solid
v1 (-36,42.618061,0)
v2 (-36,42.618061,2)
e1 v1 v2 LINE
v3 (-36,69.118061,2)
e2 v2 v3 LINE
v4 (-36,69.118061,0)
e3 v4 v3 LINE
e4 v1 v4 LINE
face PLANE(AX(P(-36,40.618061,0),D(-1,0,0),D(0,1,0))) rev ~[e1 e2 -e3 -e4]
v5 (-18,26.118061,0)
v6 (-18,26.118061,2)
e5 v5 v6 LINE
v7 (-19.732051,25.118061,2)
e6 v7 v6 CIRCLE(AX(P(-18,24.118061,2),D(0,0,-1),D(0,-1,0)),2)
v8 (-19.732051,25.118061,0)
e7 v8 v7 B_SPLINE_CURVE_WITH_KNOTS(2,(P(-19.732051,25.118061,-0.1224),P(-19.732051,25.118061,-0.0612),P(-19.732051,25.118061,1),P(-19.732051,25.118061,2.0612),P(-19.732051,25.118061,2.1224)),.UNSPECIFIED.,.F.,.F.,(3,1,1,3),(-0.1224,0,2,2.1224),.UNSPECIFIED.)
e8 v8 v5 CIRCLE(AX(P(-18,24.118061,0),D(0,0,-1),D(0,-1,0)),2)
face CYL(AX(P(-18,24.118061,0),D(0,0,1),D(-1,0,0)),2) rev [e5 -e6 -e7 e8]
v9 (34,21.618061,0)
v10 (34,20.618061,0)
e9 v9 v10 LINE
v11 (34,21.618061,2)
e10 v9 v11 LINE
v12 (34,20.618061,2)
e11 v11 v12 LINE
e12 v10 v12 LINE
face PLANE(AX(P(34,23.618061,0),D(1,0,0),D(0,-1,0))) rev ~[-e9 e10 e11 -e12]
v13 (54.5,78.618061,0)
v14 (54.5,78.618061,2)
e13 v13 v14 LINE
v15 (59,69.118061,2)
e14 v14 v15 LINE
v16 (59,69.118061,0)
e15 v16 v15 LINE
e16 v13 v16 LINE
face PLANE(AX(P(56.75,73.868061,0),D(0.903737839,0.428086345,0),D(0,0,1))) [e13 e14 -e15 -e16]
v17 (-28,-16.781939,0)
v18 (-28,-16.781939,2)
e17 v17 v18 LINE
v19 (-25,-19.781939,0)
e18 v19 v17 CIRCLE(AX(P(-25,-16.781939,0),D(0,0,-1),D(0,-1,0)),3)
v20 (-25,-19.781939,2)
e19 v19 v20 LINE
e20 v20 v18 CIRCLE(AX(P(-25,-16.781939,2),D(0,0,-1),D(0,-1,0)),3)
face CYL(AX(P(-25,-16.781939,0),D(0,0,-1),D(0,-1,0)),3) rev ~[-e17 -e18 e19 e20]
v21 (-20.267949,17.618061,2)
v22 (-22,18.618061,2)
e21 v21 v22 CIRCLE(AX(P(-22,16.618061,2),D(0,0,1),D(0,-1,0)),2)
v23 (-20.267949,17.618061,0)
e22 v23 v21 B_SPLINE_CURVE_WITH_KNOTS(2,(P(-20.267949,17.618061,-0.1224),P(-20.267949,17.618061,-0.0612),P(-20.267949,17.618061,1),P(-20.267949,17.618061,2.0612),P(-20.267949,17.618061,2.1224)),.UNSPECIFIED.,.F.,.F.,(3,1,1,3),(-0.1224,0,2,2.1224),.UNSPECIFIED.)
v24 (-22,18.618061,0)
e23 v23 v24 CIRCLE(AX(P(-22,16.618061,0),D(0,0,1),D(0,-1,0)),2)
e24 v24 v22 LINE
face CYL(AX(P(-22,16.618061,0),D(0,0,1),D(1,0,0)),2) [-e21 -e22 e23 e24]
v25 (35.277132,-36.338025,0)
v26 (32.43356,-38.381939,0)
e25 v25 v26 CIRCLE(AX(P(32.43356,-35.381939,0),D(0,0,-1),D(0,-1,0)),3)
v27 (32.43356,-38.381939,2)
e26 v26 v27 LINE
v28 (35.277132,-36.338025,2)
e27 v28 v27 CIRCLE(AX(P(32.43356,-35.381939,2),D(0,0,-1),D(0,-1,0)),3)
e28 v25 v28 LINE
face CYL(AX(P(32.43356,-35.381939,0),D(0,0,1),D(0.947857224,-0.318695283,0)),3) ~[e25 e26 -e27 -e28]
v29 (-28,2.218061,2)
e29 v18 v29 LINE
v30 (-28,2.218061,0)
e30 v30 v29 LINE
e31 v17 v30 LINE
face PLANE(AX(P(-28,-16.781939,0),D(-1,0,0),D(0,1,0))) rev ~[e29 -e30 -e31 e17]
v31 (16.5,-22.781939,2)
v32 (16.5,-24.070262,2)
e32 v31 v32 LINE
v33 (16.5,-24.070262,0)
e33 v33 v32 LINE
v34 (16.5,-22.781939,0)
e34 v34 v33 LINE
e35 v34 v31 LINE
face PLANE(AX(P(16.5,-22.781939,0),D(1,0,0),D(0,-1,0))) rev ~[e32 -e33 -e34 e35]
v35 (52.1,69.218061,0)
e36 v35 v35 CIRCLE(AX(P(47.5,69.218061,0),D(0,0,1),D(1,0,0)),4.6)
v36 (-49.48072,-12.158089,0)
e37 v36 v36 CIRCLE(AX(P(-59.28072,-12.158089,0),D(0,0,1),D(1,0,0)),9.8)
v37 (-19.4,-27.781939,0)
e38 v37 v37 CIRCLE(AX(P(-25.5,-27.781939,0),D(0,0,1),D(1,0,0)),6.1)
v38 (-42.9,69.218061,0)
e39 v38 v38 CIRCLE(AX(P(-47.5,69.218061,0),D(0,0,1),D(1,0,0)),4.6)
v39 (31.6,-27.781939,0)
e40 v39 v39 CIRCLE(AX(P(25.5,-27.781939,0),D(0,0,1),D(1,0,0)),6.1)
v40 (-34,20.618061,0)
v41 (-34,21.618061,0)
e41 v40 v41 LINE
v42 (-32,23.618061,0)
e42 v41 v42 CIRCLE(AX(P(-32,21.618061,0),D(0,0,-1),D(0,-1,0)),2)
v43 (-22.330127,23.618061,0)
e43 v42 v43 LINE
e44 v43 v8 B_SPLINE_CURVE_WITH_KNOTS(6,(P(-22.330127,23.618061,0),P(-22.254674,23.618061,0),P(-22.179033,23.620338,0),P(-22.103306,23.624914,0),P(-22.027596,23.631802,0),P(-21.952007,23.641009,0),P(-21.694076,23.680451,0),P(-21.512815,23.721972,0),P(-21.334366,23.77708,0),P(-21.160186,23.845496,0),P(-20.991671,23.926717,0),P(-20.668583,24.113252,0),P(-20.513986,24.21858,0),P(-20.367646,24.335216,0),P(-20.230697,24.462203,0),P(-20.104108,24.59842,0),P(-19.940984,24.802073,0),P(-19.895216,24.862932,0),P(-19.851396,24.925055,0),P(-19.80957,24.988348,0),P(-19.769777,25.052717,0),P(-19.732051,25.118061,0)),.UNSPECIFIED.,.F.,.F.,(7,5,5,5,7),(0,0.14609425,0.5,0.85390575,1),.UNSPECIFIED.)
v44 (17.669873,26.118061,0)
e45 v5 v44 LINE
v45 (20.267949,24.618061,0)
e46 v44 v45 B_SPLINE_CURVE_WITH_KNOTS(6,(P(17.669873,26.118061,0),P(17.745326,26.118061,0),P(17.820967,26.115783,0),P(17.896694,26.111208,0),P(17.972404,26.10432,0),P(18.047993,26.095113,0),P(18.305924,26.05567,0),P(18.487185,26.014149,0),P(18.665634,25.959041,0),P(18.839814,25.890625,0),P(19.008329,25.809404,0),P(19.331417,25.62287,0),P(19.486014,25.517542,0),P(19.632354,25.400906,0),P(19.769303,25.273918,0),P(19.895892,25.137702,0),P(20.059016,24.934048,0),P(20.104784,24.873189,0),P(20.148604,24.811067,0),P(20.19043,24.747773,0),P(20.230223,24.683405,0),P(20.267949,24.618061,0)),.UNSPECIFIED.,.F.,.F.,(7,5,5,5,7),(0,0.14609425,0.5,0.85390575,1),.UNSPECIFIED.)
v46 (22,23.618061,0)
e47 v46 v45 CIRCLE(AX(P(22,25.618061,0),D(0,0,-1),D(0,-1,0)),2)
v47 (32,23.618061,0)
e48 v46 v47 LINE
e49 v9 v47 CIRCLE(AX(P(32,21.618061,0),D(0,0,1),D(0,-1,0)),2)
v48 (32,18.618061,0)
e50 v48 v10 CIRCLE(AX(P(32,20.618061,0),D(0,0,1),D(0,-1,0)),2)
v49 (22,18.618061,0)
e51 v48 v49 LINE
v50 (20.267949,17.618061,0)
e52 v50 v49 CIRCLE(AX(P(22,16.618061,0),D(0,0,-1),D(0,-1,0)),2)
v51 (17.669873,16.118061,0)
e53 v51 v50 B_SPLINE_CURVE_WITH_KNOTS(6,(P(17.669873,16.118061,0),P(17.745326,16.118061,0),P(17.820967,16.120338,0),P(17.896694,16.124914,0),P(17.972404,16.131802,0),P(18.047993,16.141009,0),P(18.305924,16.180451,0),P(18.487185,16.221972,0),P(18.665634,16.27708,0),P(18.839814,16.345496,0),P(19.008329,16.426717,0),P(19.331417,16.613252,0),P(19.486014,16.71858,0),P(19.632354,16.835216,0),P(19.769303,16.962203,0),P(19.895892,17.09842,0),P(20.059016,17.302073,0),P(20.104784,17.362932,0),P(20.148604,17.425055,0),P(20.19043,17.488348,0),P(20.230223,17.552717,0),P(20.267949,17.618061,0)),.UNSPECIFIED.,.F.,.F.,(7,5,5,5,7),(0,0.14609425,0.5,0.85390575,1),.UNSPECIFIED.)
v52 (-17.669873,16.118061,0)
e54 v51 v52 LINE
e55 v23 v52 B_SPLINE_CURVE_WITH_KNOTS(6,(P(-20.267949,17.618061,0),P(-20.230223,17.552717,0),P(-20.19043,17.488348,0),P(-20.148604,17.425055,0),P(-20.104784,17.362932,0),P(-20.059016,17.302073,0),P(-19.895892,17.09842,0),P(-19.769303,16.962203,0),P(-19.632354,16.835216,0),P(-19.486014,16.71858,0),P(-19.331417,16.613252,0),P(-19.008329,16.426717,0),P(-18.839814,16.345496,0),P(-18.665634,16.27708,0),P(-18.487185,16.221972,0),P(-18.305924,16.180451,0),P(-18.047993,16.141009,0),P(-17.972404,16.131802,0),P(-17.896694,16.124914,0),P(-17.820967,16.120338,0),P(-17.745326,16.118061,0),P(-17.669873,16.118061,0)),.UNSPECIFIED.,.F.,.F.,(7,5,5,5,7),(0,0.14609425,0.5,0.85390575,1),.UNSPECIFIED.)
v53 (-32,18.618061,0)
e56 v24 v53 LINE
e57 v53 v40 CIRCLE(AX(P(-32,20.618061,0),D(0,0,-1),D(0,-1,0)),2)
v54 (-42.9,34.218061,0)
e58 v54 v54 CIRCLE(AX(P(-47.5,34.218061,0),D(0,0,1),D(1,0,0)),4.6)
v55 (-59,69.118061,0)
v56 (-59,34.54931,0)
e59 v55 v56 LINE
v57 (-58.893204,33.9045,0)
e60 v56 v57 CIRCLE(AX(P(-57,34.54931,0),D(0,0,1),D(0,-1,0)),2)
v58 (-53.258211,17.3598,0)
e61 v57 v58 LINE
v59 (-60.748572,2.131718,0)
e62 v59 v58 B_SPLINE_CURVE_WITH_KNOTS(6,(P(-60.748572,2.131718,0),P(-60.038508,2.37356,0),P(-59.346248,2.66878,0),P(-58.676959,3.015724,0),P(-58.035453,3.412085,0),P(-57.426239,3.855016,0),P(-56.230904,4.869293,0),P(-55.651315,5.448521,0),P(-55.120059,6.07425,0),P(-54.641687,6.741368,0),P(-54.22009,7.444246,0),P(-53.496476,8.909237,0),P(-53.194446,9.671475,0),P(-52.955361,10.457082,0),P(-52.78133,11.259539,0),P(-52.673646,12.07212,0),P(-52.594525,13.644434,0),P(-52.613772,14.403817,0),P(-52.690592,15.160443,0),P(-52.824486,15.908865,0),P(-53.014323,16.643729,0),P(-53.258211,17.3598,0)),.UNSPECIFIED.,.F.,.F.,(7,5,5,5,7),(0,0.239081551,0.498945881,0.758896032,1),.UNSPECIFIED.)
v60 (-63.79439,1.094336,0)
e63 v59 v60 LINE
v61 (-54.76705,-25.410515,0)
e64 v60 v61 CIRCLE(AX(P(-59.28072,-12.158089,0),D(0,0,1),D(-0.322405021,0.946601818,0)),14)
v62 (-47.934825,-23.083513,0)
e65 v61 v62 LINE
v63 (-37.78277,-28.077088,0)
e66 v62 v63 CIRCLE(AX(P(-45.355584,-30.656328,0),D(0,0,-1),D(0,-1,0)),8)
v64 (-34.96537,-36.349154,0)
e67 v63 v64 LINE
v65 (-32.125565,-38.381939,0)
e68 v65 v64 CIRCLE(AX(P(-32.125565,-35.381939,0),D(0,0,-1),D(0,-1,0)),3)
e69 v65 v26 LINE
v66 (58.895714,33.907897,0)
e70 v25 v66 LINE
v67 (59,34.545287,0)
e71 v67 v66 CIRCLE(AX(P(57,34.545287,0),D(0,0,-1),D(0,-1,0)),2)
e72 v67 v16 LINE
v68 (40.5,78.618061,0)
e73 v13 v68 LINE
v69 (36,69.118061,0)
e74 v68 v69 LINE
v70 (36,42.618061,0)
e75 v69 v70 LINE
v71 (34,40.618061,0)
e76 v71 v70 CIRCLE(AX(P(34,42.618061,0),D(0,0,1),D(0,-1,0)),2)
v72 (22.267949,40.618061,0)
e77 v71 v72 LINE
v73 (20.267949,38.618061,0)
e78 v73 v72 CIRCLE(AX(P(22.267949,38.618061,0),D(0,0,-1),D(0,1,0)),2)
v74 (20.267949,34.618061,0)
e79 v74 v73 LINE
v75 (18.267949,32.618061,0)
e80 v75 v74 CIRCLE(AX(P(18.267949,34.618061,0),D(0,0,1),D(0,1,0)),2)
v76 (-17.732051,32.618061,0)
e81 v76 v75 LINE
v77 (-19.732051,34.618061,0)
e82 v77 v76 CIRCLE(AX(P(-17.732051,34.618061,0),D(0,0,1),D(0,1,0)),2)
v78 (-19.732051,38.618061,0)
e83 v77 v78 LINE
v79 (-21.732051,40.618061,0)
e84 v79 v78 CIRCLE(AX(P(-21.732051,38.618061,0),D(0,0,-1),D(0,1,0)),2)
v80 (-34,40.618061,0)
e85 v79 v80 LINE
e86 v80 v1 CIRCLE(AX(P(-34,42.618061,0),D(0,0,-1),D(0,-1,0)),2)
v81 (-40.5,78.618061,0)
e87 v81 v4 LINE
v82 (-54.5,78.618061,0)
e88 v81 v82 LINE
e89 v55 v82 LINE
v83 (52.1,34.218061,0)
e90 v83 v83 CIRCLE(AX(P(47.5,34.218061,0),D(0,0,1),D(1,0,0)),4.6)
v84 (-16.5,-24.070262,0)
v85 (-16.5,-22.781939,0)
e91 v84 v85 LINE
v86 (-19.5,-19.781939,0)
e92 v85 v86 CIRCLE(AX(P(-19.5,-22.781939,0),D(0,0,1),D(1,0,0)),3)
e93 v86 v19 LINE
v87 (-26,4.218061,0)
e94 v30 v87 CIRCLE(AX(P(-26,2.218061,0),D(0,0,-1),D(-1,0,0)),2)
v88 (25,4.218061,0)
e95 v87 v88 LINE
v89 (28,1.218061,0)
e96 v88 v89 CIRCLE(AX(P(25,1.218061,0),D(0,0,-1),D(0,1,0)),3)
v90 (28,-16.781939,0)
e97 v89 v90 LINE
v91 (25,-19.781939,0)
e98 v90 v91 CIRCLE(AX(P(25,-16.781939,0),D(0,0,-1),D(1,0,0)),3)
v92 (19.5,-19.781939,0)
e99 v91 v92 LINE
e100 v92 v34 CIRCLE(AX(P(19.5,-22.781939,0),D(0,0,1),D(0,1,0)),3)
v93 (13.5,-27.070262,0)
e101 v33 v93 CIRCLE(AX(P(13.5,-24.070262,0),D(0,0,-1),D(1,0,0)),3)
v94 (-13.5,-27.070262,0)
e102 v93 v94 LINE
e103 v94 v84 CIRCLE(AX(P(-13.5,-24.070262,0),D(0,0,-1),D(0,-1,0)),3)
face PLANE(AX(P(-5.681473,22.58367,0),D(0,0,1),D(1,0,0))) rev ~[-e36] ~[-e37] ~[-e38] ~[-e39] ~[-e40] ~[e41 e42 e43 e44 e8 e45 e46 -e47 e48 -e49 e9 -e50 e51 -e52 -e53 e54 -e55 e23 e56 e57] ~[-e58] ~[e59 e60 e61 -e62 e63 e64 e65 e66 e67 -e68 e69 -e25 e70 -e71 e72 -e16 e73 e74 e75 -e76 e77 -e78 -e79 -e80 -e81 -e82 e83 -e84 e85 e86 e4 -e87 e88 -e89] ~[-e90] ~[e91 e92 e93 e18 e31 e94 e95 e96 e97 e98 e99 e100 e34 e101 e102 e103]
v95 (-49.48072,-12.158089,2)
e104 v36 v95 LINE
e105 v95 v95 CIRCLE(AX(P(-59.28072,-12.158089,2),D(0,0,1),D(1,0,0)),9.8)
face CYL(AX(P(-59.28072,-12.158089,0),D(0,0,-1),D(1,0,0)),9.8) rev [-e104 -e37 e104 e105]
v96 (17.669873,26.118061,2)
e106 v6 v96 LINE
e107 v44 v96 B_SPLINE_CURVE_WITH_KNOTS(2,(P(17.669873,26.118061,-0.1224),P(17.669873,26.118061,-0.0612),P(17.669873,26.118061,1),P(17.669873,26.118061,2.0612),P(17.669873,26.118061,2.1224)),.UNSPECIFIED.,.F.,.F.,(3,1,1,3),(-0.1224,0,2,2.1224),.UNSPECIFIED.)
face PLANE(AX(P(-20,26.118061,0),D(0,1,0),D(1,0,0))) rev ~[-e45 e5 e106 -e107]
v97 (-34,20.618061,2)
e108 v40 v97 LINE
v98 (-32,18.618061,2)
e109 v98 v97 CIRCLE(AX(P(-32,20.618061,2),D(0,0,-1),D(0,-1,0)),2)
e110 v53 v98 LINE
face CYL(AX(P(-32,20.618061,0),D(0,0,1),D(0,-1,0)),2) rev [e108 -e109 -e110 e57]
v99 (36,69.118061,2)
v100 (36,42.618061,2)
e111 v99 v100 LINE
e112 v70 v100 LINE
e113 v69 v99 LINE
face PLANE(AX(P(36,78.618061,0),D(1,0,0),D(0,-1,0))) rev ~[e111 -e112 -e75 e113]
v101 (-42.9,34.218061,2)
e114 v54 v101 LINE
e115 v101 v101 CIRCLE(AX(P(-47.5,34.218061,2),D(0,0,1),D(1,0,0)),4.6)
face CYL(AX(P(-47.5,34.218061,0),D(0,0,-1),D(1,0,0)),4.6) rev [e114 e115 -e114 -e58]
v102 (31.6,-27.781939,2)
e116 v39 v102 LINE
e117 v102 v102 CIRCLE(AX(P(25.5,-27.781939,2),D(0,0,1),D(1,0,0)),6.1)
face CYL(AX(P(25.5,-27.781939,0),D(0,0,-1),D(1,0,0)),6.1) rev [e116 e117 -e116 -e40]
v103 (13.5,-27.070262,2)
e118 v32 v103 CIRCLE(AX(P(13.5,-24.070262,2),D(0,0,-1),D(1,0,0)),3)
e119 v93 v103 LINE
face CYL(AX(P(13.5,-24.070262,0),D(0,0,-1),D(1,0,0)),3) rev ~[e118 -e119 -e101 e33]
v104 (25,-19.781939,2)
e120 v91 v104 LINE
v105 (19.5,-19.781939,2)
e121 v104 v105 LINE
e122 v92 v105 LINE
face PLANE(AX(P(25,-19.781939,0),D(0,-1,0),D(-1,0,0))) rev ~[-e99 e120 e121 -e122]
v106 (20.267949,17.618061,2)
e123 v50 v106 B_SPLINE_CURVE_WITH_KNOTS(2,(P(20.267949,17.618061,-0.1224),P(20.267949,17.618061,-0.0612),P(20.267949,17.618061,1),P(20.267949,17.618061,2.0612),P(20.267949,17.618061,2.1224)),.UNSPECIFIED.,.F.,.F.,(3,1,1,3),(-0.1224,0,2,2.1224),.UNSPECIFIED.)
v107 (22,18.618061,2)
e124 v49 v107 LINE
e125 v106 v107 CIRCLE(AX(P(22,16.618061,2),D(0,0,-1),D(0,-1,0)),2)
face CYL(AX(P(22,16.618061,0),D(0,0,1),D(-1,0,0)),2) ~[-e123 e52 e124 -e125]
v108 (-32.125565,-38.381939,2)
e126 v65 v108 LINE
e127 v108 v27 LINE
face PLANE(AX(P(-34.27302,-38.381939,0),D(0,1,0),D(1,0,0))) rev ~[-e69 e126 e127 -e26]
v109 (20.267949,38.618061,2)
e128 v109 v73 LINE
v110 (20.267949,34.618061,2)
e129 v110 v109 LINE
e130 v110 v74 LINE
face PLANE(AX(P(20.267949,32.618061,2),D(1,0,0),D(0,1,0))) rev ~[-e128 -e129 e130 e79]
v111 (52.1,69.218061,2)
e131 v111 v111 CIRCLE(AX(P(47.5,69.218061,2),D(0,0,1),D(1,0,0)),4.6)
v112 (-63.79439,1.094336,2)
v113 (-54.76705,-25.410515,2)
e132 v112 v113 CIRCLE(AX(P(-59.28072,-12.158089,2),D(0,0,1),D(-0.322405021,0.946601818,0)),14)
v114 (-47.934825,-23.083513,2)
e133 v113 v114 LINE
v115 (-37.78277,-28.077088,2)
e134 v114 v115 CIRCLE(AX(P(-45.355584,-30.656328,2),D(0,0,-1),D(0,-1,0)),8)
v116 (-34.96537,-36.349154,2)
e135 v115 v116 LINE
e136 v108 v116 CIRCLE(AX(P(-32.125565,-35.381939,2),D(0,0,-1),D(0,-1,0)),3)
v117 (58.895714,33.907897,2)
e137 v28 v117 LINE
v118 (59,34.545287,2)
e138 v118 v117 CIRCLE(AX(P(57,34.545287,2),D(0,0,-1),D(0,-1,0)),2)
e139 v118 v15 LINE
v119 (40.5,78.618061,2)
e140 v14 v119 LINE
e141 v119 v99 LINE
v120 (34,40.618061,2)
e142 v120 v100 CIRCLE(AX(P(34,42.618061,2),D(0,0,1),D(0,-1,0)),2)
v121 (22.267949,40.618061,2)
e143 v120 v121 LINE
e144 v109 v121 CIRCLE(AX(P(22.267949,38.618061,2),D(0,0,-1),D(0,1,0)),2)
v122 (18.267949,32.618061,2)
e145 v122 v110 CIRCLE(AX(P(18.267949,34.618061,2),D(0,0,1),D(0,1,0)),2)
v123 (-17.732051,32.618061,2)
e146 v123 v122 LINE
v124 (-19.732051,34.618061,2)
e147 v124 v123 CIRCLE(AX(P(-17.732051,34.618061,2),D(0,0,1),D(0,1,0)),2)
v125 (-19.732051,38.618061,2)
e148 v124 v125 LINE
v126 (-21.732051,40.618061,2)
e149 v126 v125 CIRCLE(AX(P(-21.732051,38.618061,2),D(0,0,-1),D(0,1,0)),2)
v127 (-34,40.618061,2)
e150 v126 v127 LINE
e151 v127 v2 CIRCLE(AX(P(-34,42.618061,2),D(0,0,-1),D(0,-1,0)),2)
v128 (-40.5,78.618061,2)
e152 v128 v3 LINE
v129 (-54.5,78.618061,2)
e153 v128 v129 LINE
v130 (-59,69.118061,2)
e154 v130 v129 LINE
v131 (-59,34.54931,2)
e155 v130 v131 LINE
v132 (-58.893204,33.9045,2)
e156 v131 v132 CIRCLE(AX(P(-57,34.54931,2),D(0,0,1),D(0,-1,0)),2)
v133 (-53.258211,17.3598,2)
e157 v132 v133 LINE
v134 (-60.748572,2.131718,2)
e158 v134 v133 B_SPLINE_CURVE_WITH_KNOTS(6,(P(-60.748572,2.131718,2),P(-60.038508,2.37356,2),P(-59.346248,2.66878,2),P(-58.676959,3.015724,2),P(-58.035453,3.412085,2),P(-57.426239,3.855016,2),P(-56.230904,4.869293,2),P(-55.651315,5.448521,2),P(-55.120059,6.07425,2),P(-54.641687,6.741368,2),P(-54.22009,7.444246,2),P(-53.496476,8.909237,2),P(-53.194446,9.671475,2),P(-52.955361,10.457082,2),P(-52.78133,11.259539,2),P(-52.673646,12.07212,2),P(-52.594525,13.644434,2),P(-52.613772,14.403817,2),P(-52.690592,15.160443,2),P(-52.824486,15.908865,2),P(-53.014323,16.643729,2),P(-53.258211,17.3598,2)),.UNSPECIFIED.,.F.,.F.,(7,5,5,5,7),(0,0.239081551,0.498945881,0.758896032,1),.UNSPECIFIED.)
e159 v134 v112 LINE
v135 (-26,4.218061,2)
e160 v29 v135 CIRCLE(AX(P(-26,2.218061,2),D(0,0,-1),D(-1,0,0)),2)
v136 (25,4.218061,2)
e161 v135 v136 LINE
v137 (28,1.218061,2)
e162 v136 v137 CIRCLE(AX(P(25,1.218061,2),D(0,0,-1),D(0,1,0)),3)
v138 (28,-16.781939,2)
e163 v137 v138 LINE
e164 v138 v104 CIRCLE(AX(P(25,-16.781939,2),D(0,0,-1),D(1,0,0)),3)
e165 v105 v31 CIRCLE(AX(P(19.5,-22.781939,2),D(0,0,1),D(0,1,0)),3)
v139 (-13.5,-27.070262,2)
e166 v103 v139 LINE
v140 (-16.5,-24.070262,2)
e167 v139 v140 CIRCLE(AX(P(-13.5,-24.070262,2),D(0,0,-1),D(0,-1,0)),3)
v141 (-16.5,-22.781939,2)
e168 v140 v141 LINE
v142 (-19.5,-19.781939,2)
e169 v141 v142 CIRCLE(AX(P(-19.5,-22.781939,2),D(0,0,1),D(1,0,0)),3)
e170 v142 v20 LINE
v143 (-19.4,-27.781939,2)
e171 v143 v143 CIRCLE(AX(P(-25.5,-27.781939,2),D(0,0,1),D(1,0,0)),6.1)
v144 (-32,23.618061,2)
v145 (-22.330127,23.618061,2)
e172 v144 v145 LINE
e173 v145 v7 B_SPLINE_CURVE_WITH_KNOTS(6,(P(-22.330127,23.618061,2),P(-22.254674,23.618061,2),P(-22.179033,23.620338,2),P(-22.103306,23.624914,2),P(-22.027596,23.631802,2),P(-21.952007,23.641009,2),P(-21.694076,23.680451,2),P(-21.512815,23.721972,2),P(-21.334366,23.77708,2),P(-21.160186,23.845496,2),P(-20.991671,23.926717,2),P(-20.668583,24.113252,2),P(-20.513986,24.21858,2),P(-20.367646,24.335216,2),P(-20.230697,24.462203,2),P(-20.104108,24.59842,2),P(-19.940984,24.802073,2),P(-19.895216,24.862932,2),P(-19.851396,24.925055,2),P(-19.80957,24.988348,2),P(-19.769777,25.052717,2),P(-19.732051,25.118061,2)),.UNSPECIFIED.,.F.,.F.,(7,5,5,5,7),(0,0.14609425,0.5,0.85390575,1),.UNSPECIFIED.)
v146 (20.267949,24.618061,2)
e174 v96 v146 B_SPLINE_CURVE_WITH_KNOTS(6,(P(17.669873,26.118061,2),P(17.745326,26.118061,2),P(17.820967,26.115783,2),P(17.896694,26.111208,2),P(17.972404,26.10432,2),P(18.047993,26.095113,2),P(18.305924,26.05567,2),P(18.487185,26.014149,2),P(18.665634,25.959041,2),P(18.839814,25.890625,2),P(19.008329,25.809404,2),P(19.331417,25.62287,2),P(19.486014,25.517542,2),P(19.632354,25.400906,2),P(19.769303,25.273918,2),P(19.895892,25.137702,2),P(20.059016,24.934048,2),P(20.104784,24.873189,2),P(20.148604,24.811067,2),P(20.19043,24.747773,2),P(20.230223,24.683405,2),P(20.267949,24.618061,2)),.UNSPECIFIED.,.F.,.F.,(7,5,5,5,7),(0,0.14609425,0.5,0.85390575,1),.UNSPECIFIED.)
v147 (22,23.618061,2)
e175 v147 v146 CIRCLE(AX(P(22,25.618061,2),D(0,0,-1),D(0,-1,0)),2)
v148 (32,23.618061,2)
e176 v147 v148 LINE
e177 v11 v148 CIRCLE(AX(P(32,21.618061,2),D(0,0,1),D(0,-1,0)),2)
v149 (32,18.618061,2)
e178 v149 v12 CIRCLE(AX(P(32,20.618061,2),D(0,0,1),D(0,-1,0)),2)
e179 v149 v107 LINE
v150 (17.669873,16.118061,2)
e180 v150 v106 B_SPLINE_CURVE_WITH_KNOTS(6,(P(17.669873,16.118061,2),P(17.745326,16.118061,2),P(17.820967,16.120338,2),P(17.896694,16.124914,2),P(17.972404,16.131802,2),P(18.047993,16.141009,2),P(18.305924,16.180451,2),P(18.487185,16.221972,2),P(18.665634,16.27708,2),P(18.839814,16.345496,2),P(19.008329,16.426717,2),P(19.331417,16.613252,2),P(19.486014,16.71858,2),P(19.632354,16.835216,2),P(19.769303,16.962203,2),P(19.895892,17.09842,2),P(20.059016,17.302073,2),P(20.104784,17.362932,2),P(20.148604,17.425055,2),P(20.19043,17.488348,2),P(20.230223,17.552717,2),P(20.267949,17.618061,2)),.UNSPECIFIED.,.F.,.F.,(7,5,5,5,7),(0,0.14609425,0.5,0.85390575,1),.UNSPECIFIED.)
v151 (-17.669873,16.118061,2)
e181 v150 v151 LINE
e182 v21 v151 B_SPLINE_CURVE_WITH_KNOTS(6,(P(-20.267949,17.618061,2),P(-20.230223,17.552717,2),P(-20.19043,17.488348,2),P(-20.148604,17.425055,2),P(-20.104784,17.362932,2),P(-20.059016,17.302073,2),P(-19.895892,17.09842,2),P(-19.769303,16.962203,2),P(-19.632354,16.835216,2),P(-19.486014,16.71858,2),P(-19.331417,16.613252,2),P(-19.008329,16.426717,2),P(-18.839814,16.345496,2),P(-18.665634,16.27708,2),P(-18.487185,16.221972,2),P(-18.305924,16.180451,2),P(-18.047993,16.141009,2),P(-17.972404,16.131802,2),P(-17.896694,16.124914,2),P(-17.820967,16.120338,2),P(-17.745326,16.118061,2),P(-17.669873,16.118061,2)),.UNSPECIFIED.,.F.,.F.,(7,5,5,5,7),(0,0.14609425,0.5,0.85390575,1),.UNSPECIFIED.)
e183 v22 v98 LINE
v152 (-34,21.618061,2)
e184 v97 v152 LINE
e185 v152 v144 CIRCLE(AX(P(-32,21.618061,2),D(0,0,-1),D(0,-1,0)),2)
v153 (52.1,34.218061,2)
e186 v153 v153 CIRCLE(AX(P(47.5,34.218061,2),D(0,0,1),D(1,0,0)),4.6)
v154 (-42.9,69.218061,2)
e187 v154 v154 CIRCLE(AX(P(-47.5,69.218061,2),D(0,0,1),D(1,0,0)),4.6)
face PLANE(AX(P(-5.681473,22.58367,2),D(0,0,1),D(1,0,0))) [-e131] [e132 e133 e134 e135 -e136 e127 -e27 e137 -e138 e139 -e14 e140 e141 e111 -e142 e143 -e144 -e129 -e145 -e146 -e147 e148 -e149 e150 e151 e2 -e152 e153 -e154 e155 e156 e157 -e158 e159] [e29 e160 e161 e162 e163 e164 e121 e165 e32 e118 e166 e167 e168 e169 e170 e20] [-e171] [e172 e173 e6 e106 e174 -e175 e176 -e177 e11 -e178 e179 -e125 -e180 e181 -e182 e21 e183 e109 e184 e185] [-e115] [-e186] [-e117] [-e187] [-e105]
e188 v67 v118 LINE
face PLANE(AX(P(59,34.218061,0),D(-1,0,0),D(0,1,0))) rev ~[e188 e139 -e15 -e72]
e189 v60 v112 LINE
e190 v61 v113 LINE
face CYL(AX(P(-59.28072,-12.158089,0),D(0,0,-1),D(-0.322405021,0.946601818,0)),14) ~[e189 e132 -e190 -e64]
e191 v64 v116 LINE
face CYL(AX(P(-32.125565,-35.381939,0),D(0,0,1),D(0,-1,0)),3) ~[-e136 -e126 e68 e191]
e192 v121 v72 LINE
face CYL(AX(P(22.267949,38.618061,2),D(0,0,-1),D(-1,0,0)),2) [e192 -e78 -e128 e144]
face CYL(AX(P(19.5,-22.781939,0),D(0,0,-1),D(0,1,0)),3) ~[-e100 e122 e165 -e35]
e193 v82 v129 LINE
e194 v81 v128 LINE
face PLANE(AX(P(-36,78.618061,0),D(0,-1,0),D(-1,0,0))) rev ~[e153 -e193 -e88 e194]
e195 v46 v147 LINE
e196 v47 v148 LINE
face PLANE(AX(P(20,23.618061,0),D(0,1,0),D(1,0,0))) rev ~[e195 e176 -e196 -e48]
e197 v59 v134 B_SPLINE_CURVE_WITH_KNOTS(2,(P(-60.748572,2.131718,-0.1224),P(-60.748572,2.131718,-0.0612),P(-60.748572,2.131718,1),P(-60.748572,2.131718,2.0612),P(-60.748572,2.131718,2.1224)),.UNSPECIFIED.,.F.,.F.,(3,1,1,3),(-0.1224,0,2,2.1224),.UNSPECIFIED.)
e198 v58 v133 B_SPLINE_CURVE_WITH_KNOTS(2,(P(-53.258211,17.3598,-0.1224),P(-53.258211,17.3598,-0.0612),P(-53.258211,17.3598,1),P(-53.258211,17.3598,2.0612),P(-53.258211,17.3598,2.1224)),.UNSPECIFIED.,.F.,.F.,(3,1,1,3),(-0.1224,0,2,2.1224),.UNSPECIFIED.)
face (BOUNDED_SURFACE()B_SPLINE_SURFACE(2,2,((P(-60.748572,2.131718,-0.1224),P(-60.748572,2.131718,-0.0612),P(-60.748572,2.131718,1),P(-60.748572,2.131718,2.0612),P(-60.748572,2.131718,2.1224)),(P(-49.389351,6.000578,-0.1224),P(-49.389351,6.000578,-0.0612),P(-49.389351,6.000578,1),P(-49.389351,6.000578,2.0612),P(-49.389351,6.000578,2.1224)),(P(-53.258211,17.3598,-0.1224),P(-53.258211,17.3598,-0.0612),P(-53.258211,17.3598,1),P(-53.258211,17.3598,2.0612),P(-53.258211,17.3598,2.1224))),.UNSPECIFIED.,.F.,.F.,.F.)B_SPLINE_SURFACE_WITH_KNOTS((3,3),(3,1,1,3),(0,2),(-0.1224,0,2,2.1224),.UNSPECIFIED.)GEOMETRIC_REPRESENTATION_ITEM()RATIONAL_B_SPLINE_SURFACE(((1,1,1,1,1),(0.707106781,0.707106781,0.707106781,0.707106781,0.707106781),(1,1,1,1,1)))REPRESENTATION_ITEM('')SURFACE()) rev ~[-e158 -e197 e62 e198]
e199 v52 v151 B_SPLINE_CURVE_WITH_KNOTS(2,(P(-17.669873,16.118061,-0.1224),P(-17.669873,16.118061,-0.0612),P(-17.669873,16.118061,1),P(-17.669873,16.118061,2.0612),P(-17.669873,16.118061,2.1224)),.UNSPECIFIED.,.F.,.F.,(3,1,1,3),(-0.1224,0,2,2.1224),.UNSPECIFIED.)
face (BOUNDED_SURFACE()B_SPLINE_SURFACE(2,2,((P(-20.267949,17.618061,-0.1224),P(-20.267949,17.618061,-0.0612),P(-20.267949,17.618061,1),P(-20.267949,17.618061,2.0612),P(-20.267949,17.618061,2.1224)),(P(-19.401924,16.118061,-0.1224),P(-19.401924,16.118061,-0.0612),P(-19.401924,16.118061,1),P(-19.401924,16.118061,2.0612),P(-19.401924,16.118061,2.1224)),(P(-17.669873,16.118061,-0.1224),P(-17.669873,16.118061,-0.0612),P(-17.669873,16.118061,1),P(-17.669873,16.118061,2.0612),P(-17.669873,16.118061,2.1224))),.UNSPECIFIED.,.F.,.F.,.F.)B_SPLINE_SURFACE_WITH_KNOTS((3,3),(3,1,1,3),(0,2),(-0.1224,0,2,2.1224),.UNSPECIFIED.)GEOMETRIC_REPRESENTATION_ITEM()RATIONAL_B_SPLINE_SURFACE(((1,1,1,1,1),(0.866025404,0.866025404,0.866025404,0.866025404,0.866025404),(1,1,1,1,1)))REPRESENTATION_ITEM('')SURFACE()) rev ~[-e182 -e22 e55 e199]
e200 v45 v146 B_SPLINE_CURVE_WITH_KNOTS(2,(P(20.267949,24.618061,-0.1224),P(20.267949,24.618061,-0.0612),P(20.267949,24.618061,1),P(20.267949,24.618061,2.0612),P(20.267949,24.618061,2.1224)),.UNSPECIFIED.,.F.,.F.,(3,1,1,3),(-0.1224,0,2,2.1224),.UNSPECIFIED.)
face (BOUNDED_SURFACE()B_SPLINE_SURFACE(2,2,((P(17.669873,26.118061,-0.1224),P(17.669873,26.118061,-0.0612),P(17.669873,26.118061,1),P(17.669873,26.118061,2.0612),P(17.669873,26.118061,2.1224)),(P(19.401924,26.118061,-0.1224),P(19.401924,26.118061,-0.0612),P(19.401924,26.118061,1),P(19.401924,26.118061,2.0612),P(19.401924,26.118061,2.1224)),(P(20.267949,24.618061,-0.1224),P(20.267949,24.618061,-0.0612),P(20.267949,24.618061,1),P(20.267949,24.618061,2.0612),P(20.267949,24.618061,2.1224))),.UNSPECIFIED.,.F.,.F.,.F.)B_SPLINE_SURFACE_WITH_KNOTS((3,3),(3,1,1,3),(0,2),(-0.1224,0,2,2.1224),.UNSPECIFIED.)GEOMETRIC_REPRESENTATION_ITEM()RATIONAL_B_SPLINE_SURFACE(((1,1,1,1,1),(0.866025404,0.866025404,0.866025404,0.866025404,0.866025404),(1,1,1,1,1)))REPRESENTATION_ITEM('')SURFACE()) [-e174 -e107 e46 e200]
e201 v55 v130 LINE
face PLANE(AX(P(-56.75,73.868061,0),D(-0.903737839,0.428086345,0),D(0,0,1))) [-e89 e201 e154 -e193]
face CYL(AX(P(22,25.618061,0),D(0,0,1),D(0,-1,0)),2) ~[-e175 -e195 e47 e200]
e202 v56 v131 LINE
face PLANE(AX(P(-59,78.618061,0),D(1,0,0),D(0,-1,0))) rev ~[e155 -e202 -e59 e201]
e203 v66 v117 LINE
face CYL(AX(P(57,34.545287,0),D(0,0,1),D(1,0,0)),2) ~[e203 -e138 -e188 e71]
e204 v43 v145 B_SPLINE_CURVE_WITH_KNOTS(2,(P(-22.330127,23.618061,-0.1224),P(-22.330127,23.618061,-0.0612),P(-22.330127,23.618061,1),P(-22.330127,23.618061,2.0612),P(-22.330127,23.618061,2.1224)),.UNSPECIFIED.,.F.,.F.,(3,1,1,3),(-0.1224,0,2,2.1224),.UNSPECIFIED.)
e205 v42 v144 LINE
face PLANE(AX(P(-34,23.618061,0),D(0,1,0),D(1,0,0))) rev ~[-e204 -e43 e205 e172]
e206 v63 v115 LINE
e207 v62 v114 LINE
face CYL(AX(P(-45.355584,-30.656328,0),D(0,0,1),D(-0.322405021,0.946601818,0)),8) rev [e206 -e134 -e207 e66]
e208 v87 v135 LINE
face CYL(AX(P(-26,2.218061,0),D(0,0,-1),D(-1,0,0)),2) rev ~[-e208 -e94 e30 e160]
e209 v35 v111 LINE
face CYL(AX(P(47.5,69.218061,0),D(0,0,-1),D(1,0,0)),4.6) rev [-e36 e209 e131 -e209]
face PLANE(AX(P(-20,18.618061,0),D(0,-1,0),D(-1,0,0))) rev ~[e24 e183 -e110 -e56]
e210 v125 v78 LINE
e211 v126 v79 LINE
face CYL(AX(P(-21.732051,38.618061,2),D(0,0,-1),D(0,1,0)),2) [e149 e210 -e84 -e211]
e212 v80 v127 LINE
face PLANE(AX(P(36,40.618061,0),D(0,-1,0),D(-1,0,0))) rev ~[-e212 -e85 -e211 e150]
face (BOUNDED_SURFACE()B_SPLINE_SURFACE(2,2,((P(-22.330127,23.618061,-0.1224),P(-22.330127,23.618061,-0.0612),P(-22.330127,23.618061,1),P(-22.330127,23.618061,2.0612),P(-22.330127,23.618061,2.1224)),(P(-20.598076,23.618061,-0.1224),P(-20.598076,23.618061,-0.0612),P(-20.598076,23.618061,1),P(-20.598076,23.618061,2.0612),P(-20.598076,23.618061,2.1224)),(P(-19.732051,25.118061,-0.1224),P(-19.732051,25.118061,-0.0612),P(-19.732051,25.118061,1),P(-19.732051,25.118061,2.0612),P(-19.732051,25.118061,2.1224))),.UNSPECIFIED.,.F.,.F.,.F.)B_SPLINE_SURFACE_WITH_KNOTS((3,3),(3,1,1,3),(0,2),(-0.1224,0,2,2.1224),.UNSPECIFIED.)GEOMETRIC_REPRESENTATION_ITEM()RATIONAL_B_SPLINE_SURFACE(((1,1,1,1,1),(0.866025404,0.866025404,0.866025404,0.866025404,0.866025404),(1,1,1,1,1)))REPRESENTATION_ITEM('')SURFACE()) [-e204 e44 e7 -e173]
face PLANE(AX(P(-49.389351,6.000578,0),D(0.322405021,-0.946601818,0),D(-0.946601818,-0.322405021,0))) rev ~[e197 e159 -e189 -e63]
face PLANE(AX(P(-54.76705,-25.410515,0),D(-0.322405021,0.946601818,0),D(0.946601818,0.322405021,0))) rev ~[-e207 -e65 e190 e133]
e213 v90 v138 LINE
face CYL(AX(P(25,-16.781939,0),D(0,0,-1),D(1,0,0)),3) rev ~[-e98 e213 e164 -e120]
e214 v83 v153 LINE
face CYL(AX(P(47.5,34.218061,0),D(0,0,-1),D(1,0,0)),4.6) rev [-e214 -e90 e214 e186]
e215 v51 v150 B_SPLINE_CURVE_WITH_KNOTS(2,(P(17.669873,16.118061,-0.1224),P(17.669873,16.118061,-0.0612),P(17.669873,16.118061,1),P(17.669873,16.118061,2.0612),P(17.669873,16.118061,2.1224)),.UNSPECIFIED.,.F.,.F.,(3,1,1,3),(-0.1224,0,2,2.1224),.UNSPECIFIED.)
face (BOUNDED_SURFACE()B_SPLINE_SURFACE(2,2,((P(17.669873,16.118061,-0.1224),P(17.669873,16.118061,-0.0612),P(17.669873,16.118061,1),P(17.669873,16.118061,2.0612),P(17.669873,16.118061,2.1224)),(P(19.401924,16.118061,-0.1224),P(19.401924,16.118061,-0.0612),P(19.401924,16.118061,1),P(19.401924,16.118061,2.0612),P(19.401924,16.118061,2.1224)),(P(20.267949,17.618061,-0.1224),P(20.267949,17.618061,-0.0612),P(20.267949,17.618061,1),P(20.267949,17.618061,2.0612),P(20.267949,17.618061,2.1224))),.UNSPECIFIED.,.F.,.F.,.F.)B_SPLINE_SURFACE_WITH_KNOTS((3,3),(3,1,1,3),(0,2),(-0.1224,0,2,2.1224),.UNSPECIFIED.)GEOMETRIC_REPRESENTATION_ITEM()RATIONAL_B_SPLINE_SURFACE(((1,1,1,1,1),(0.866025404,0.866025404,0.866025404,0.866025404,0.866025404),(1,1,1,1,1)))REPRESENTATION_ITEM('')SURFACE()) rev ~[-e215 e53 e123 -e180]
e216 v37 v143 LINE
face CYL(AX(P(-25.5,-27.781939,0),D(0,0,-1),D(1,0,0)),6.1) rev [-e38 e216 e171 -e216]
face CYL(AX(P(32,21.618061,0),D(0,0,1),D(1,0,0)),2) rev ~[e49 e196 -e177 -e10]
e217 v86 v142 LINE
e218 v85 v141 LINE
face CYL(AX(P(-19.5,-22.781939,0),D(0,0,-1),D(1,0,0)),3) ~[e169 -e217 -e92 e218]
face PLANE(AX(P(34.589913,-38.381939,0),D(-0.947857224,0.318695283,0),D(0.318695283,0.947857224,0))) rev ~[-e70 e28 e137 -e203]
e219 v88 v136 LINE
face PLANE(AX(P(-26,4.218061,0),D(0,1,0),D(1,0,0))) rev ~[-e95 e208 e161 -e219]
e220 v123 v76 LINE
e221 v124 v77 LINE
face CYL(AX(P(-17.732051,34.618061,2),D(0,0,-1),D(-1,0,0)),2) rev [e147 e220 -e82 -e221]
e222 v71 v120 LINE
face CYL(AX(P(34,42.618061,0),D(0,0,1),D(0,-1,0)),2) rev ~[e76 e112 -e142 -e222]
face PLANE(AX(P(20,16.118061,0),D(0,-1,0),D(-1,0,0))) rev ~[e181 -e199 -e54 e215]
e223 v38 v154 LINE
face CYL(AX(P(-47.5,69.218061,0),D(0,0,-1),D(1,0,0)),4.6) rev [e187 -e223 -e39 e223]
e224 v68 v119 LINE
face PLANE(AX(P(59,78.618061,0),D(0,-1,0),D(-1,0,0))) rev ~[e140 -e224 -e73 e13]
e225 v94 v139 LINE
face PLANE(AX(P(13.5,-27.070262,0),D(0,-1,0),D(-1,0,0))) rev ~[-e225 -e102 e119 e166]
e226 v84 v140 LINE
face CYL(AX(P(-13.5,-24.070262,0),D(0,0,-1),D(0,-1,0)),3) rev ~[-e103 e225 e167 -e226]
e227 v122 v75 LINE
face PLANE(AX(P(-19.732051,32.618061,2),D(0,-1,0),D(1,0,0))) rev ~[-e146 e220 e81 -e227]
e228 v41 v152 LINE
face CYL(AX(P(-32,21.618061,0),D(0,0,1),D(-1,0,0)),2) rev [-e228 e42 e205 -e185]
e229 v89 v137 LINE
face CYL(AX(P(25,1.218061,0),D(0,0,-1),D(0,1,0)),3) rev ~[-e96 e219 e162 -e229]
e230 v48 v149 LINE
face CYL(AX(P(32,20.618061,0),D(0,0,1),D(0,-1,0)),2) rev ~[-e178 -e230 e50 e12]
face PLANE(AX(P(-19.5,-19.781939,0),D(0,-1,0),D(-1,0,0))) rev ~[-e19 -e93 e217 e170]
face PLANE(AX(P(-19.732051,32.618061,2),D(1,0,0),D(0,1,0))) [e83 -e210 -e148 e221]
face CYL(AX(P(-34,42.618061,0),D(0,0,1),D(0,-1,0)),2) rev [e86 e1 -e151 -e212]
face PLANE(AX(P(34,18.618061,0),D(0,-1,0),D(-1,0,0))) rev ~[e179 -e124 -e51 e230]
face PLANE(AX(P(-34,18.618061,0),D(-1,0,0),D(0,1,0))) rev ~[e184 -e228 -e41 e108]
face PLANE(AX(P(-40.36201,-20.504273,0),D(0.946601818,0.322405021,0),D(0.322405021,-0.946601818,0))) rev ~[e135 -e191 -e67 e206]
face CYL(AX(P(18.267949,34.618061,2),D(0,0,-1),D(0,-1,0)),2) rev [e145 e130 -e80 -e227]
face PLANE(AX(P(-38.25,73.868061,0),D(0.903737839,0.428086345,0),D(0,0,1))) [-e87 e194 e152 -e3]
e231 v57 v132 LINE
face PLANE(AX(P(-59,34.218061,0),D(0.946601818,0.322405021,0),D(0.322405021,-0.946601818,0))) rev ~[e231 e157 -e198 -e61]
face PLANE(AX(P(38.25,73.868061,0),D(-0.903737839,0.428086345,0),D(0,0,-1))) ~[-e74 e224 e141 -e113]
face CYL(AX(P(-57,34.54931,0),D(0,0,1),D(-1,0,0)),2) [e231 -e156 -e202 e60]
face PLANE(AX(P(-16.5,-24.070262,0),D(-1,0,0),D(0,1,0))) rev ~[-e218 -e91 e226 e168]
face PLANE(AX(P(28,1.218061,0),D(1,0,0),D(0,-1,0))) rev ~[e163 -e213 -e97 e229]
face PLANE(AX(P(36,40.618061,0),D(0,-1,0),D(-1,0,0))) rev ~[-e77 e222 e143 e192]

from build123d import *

# Parameters (mm, degrees)
F0_R        = 9.8
F0_R_2      = 6.1
F0_R_3      = 4.6
F1_DEPTH    = 2
F2_R        = 2
F3_R        = 3
F4_W        = 40
F4_H        = 8
F5_DEPTH    = 25
F6_R        = 2
F7_R        = 8
F8_R        = 12
F9_C1_SIZE2 = 4.5
F9_C1_SIZE  = 9.5
F9_C2_SIZE2 = 9.5
F9_C2_SIZE  = 4.5
F9_C3_SIZE2 = 9.5
F9_C3_SIZE  = 4.5
F9_C4_SIZE2 = 9.5
F9_C4_SIZE  = 4.5


# Not quite as in the source:
# - two fillets or chamfers of one size are made in one step


with BuildPart() as f1:
    # F0 (on Top) → F1 (new body)
    with BuildSketch(Plane.XY):
        with BuildLine():
            Line((36, 40.6180607378), (-36, 40.6180607378))
            Line((-36, 40.6180607378), (-36, 78.6180607378))
            Line((-36, 78.6180607378), (-59, 78.6180607378))
            Line((-59, 78.6180607378), (-59, 40.6180607378))
            Line((-59, 40.6180607378), (-59, 34.2180607378))
            Line((-59, 34.2180607378), (-52.466149277, 15.0342559872))
            Line((-52.466149277, 15.0342559872), (-49.3893506198, 6.000577809))
            Line((-49.3893506198, 6.000577809), (-63.7943902368, 1.0943363339))
            ThreePointArc((-63.7943902368, 1.0943363339), (-72.5331453979, -16.6717594171), (-54.7670496468, -25.4105145782))
            Line((-54.7670496468, -25.4105145782), (-40.3620100298, -20.5042731031))
            Line((-40.3620100298, -20.5042731031), (-34.2730196821, -38.3819392622))
            Line((-34.2730196821, -38.3819392622), (34.5899127424, -38.3819392622))
            Line((34.5899127424, -38.3819392622), (59, 34.2180607378))
            Line((59, 34.2180607378), (59, 40.6180607378))
            Line((59, 40.6180607378), (59, 78.6180607378))
            Line((59, 78.6180607378), (36, 78.6180607378))
            Line((36, 78.6180607378), (36, 40.6180607378))
        make_face()
        with Locations((-59.2807199418, -12.1580891221)):
            Circle(F0_R, mode=Mode.SUBTRACT)
        with Locations((-25.5, -27.7819392622)):
            Circle(F0_R_2, mode=Mode.SUBTRACT)
        with Locations((25.5, -27.7819392622)):
            Circle(F0_R_2, mode=Mode.SUBTRACT)
        with BuildLine():
            ThreePointArc((-28, 2.2180607378), (-27.4142135624, 3.6322743002), (-26, 4.2180607378))
            Line((-26, 4.2180607378), (25, 4.2180607378))
            ThreePointArc((25, 4.2180607378), (27.1213203436, 3.3393810814), (28, 1.2180607378))
            Line((28, 1.2180607378), (28, -16.7819392622))
            ThreePointArc((28, -16.7819392622), (27.1213203436, -18.9032596057), (25, -19.7819392622))
            Line((25, -19.7819392622), (19.5, -19.7819392622))
            ThreePointArc((19.5, -19.7819392622), (17.3786796564, -20.6606189186), (16.5, -22.7819392622))
            Line((16.5, -22.7819392622), (16.5, -24.0702618733))
            ThreePointArc((16.5, -24.0702618733), (15.6213203436, -26.1915822169), (13.5, -27.0702618733))
            Line((13.5, -27.0702618733), (-13.5, -27.0702618733))
            ThreePointArc((-13.5, -27.0702618733), (-15.6213203436, -26.1915822169), (-16.5, -24.0702618733))
            Line((-16.5, -24.0702618733), (-16.5, -22.7819392622))
            ThreePointArc((-16.5, -22.7819392622), (-17.3786796564, -20.6606189186), (-19.5, -19.7819392622))
            Line((-19.5, -19.7819392622), (-25, -19.7819392622))
            ThreePointArc((-25, -19.7819392622), (-27.1213203436, -18.9032596057), (-28, -16.7819392622))
            Line((-28, -16.7819392622), (-28, 2.2180607378))
        make_face(mode=Mode.SUBTRACT)
        with Locations((-47.5, 34.2180607378)):
            Circle(F0_R_3, mode=Mode.SUBTRACT)
        with Locations((-47.5, 69.2180607378)):
            Circle(F0_R_3, mode=Mode.SUBTRACT)
        Polygon((-20, 18.6180607378), (-34, 18.6180607378), (-34, 23.6180607378), (-20, 23.6180607378), (-20, 26.1180607378), (20, 26.1180607378), (20, 23.6180607378), (34, 23.6180607378), (34, 18.6180607378), (20, 18.6180607378), (20, 16.1180607378), (-20, 16.1180607378), align=None, mode=Mode.SUBTRACT)
        with Locations((47.5, 34.2180607378)):
            Circle(F0_R_3, mode=Mode.SUBTRACT)
        with Locations((47.5, 69.2180607378)):
            Circle(F0_R_3, mode=Mode.SUBTRACT)
    extrude(amount=F1_DEPTH)

    # F2
    f2_edges = [f1.edges().sort_by_distance(p)[0] for p in [
        (59, 34.218061, 1),
        (-20, 26.118061, 1),
        (20, 23.618061, 1),
        (-34, 23.618061, 1),
        (-20, 18.618061, 1),
        (-34, 18.618061, 1),
        (20, 18.618061, 1),
        (34, 23.618061, 1),
        (34, 18.618061, 1),
        (-59, 34.218061, 1),
        (-36, 40.618061, 1),
        (36, 40.618061, 1),
    ]]
    fillet(f2_edges, radius=F2_R)

    # F3
    f3_edges = [f1.edges().sort_by_distance(p)[0] for p in [
        (-20, 23.618061, 1),
        (-20, 16.118061, 1),
        (20, 26.118061, 1),
        (20, 16.118061, 1),
        (-34.27302, -38.381939, 1),
        (34.589913, -38.381939, 1),
    ]]
    fillet(f3_edges, radius=F3_R)

    # F4 (on face) → F5 (cut)
    with BuildSketch(Plane.XY.offset(2)):
        with Locations((0.2679491924, 36.6180607378)):
            Rectangle(F4_W, F4_H)
    extrude(amount=-F5_DEPTH, mode=Mode.SUBTRACT)

    # F6
    f6_edges = [f1.edges().sort_by_distance(p)[0] for p in [
        (-19.732051, 40.618061, 1),
        (-19.732051, 32.618061, 1),
        (20.267949, 40.618061, 1),
        (20.267949, 32.618061, 1),
    ]]
    fillet(f6_edges, radius=F6_R)

    # F7
    f7_edges = [f1.edges().sort_by_distance(p)[0] for p in [
        (-40.36201, -20.504273, 1),
    ]]
    fillet(f7_edges, radius=F7_R)

    # F8
    f8_edges = [f1.edges().sort_by_distance(p)[0] for p in [
        (-49.389351, 6.000578, 1),
    ]]
    fillet(f8_edges, radius=F8_R)

    # F9: chamfer of 9.5 x 4.5 on 4 edges, made by hand

    # F9_c1
    f9_c1_edges = [f1.edges().sort_by_distance(p)[0] for p in [
        (-59, 78.6180607378, 1),
    ]]
    f9_c1_side = f1.faces().sort_by_distance((-59, 78.5280607378, 1))[0]
    chamfer(f9_c1_edges, length=F9_C1_SIZE, length2=F9_C1_SIZE2, reference=f9_c1_side)

    # F9_c2
    f9_c2_edges = [f1.edges().sort_by_distance(p)[0] for p in [
        (-36, 78.6180607378, 1),
    ]]
    f9_c2_side = f1.faces().sort_by_distance((-36.09, 78.6180607378, 1))[0]
    chamfer(f9_c2_edges, length=F9_C2_SIZE, length2=F9_C2_SIZE2, reference=f9_c2_side)

    # F9_c3
    f9_c3_edges = [f1.edges().sort_by_distance(p)[0] for p in [
        (59, 78.6180607378, 1),
    ]]
    f9_c3_side = f1.faces().sort_by_distance((58.91, 78.6180607378, 1))[0]
    chamfer(f9_c3_edges, length=F9_C3_SIZE, length2=F9_C3_SIZE2, reference=f9_c3_side)

    # F9_c4
    f9_c4_edges = [f1.edges().sort_by_distance(p)[0] for p in [
        (36, 78.6180607378, 1),
    ]]
    f9_c4_side = f1.faces().sort_by_distance((36.09, 78.6180607378, 1))[0]
    chamfer(f9_c4_edges, length=F9_C4_SIZE, length2=F9_C4_SIZE2, reference=f9_c4_side)


solid = f1.part
